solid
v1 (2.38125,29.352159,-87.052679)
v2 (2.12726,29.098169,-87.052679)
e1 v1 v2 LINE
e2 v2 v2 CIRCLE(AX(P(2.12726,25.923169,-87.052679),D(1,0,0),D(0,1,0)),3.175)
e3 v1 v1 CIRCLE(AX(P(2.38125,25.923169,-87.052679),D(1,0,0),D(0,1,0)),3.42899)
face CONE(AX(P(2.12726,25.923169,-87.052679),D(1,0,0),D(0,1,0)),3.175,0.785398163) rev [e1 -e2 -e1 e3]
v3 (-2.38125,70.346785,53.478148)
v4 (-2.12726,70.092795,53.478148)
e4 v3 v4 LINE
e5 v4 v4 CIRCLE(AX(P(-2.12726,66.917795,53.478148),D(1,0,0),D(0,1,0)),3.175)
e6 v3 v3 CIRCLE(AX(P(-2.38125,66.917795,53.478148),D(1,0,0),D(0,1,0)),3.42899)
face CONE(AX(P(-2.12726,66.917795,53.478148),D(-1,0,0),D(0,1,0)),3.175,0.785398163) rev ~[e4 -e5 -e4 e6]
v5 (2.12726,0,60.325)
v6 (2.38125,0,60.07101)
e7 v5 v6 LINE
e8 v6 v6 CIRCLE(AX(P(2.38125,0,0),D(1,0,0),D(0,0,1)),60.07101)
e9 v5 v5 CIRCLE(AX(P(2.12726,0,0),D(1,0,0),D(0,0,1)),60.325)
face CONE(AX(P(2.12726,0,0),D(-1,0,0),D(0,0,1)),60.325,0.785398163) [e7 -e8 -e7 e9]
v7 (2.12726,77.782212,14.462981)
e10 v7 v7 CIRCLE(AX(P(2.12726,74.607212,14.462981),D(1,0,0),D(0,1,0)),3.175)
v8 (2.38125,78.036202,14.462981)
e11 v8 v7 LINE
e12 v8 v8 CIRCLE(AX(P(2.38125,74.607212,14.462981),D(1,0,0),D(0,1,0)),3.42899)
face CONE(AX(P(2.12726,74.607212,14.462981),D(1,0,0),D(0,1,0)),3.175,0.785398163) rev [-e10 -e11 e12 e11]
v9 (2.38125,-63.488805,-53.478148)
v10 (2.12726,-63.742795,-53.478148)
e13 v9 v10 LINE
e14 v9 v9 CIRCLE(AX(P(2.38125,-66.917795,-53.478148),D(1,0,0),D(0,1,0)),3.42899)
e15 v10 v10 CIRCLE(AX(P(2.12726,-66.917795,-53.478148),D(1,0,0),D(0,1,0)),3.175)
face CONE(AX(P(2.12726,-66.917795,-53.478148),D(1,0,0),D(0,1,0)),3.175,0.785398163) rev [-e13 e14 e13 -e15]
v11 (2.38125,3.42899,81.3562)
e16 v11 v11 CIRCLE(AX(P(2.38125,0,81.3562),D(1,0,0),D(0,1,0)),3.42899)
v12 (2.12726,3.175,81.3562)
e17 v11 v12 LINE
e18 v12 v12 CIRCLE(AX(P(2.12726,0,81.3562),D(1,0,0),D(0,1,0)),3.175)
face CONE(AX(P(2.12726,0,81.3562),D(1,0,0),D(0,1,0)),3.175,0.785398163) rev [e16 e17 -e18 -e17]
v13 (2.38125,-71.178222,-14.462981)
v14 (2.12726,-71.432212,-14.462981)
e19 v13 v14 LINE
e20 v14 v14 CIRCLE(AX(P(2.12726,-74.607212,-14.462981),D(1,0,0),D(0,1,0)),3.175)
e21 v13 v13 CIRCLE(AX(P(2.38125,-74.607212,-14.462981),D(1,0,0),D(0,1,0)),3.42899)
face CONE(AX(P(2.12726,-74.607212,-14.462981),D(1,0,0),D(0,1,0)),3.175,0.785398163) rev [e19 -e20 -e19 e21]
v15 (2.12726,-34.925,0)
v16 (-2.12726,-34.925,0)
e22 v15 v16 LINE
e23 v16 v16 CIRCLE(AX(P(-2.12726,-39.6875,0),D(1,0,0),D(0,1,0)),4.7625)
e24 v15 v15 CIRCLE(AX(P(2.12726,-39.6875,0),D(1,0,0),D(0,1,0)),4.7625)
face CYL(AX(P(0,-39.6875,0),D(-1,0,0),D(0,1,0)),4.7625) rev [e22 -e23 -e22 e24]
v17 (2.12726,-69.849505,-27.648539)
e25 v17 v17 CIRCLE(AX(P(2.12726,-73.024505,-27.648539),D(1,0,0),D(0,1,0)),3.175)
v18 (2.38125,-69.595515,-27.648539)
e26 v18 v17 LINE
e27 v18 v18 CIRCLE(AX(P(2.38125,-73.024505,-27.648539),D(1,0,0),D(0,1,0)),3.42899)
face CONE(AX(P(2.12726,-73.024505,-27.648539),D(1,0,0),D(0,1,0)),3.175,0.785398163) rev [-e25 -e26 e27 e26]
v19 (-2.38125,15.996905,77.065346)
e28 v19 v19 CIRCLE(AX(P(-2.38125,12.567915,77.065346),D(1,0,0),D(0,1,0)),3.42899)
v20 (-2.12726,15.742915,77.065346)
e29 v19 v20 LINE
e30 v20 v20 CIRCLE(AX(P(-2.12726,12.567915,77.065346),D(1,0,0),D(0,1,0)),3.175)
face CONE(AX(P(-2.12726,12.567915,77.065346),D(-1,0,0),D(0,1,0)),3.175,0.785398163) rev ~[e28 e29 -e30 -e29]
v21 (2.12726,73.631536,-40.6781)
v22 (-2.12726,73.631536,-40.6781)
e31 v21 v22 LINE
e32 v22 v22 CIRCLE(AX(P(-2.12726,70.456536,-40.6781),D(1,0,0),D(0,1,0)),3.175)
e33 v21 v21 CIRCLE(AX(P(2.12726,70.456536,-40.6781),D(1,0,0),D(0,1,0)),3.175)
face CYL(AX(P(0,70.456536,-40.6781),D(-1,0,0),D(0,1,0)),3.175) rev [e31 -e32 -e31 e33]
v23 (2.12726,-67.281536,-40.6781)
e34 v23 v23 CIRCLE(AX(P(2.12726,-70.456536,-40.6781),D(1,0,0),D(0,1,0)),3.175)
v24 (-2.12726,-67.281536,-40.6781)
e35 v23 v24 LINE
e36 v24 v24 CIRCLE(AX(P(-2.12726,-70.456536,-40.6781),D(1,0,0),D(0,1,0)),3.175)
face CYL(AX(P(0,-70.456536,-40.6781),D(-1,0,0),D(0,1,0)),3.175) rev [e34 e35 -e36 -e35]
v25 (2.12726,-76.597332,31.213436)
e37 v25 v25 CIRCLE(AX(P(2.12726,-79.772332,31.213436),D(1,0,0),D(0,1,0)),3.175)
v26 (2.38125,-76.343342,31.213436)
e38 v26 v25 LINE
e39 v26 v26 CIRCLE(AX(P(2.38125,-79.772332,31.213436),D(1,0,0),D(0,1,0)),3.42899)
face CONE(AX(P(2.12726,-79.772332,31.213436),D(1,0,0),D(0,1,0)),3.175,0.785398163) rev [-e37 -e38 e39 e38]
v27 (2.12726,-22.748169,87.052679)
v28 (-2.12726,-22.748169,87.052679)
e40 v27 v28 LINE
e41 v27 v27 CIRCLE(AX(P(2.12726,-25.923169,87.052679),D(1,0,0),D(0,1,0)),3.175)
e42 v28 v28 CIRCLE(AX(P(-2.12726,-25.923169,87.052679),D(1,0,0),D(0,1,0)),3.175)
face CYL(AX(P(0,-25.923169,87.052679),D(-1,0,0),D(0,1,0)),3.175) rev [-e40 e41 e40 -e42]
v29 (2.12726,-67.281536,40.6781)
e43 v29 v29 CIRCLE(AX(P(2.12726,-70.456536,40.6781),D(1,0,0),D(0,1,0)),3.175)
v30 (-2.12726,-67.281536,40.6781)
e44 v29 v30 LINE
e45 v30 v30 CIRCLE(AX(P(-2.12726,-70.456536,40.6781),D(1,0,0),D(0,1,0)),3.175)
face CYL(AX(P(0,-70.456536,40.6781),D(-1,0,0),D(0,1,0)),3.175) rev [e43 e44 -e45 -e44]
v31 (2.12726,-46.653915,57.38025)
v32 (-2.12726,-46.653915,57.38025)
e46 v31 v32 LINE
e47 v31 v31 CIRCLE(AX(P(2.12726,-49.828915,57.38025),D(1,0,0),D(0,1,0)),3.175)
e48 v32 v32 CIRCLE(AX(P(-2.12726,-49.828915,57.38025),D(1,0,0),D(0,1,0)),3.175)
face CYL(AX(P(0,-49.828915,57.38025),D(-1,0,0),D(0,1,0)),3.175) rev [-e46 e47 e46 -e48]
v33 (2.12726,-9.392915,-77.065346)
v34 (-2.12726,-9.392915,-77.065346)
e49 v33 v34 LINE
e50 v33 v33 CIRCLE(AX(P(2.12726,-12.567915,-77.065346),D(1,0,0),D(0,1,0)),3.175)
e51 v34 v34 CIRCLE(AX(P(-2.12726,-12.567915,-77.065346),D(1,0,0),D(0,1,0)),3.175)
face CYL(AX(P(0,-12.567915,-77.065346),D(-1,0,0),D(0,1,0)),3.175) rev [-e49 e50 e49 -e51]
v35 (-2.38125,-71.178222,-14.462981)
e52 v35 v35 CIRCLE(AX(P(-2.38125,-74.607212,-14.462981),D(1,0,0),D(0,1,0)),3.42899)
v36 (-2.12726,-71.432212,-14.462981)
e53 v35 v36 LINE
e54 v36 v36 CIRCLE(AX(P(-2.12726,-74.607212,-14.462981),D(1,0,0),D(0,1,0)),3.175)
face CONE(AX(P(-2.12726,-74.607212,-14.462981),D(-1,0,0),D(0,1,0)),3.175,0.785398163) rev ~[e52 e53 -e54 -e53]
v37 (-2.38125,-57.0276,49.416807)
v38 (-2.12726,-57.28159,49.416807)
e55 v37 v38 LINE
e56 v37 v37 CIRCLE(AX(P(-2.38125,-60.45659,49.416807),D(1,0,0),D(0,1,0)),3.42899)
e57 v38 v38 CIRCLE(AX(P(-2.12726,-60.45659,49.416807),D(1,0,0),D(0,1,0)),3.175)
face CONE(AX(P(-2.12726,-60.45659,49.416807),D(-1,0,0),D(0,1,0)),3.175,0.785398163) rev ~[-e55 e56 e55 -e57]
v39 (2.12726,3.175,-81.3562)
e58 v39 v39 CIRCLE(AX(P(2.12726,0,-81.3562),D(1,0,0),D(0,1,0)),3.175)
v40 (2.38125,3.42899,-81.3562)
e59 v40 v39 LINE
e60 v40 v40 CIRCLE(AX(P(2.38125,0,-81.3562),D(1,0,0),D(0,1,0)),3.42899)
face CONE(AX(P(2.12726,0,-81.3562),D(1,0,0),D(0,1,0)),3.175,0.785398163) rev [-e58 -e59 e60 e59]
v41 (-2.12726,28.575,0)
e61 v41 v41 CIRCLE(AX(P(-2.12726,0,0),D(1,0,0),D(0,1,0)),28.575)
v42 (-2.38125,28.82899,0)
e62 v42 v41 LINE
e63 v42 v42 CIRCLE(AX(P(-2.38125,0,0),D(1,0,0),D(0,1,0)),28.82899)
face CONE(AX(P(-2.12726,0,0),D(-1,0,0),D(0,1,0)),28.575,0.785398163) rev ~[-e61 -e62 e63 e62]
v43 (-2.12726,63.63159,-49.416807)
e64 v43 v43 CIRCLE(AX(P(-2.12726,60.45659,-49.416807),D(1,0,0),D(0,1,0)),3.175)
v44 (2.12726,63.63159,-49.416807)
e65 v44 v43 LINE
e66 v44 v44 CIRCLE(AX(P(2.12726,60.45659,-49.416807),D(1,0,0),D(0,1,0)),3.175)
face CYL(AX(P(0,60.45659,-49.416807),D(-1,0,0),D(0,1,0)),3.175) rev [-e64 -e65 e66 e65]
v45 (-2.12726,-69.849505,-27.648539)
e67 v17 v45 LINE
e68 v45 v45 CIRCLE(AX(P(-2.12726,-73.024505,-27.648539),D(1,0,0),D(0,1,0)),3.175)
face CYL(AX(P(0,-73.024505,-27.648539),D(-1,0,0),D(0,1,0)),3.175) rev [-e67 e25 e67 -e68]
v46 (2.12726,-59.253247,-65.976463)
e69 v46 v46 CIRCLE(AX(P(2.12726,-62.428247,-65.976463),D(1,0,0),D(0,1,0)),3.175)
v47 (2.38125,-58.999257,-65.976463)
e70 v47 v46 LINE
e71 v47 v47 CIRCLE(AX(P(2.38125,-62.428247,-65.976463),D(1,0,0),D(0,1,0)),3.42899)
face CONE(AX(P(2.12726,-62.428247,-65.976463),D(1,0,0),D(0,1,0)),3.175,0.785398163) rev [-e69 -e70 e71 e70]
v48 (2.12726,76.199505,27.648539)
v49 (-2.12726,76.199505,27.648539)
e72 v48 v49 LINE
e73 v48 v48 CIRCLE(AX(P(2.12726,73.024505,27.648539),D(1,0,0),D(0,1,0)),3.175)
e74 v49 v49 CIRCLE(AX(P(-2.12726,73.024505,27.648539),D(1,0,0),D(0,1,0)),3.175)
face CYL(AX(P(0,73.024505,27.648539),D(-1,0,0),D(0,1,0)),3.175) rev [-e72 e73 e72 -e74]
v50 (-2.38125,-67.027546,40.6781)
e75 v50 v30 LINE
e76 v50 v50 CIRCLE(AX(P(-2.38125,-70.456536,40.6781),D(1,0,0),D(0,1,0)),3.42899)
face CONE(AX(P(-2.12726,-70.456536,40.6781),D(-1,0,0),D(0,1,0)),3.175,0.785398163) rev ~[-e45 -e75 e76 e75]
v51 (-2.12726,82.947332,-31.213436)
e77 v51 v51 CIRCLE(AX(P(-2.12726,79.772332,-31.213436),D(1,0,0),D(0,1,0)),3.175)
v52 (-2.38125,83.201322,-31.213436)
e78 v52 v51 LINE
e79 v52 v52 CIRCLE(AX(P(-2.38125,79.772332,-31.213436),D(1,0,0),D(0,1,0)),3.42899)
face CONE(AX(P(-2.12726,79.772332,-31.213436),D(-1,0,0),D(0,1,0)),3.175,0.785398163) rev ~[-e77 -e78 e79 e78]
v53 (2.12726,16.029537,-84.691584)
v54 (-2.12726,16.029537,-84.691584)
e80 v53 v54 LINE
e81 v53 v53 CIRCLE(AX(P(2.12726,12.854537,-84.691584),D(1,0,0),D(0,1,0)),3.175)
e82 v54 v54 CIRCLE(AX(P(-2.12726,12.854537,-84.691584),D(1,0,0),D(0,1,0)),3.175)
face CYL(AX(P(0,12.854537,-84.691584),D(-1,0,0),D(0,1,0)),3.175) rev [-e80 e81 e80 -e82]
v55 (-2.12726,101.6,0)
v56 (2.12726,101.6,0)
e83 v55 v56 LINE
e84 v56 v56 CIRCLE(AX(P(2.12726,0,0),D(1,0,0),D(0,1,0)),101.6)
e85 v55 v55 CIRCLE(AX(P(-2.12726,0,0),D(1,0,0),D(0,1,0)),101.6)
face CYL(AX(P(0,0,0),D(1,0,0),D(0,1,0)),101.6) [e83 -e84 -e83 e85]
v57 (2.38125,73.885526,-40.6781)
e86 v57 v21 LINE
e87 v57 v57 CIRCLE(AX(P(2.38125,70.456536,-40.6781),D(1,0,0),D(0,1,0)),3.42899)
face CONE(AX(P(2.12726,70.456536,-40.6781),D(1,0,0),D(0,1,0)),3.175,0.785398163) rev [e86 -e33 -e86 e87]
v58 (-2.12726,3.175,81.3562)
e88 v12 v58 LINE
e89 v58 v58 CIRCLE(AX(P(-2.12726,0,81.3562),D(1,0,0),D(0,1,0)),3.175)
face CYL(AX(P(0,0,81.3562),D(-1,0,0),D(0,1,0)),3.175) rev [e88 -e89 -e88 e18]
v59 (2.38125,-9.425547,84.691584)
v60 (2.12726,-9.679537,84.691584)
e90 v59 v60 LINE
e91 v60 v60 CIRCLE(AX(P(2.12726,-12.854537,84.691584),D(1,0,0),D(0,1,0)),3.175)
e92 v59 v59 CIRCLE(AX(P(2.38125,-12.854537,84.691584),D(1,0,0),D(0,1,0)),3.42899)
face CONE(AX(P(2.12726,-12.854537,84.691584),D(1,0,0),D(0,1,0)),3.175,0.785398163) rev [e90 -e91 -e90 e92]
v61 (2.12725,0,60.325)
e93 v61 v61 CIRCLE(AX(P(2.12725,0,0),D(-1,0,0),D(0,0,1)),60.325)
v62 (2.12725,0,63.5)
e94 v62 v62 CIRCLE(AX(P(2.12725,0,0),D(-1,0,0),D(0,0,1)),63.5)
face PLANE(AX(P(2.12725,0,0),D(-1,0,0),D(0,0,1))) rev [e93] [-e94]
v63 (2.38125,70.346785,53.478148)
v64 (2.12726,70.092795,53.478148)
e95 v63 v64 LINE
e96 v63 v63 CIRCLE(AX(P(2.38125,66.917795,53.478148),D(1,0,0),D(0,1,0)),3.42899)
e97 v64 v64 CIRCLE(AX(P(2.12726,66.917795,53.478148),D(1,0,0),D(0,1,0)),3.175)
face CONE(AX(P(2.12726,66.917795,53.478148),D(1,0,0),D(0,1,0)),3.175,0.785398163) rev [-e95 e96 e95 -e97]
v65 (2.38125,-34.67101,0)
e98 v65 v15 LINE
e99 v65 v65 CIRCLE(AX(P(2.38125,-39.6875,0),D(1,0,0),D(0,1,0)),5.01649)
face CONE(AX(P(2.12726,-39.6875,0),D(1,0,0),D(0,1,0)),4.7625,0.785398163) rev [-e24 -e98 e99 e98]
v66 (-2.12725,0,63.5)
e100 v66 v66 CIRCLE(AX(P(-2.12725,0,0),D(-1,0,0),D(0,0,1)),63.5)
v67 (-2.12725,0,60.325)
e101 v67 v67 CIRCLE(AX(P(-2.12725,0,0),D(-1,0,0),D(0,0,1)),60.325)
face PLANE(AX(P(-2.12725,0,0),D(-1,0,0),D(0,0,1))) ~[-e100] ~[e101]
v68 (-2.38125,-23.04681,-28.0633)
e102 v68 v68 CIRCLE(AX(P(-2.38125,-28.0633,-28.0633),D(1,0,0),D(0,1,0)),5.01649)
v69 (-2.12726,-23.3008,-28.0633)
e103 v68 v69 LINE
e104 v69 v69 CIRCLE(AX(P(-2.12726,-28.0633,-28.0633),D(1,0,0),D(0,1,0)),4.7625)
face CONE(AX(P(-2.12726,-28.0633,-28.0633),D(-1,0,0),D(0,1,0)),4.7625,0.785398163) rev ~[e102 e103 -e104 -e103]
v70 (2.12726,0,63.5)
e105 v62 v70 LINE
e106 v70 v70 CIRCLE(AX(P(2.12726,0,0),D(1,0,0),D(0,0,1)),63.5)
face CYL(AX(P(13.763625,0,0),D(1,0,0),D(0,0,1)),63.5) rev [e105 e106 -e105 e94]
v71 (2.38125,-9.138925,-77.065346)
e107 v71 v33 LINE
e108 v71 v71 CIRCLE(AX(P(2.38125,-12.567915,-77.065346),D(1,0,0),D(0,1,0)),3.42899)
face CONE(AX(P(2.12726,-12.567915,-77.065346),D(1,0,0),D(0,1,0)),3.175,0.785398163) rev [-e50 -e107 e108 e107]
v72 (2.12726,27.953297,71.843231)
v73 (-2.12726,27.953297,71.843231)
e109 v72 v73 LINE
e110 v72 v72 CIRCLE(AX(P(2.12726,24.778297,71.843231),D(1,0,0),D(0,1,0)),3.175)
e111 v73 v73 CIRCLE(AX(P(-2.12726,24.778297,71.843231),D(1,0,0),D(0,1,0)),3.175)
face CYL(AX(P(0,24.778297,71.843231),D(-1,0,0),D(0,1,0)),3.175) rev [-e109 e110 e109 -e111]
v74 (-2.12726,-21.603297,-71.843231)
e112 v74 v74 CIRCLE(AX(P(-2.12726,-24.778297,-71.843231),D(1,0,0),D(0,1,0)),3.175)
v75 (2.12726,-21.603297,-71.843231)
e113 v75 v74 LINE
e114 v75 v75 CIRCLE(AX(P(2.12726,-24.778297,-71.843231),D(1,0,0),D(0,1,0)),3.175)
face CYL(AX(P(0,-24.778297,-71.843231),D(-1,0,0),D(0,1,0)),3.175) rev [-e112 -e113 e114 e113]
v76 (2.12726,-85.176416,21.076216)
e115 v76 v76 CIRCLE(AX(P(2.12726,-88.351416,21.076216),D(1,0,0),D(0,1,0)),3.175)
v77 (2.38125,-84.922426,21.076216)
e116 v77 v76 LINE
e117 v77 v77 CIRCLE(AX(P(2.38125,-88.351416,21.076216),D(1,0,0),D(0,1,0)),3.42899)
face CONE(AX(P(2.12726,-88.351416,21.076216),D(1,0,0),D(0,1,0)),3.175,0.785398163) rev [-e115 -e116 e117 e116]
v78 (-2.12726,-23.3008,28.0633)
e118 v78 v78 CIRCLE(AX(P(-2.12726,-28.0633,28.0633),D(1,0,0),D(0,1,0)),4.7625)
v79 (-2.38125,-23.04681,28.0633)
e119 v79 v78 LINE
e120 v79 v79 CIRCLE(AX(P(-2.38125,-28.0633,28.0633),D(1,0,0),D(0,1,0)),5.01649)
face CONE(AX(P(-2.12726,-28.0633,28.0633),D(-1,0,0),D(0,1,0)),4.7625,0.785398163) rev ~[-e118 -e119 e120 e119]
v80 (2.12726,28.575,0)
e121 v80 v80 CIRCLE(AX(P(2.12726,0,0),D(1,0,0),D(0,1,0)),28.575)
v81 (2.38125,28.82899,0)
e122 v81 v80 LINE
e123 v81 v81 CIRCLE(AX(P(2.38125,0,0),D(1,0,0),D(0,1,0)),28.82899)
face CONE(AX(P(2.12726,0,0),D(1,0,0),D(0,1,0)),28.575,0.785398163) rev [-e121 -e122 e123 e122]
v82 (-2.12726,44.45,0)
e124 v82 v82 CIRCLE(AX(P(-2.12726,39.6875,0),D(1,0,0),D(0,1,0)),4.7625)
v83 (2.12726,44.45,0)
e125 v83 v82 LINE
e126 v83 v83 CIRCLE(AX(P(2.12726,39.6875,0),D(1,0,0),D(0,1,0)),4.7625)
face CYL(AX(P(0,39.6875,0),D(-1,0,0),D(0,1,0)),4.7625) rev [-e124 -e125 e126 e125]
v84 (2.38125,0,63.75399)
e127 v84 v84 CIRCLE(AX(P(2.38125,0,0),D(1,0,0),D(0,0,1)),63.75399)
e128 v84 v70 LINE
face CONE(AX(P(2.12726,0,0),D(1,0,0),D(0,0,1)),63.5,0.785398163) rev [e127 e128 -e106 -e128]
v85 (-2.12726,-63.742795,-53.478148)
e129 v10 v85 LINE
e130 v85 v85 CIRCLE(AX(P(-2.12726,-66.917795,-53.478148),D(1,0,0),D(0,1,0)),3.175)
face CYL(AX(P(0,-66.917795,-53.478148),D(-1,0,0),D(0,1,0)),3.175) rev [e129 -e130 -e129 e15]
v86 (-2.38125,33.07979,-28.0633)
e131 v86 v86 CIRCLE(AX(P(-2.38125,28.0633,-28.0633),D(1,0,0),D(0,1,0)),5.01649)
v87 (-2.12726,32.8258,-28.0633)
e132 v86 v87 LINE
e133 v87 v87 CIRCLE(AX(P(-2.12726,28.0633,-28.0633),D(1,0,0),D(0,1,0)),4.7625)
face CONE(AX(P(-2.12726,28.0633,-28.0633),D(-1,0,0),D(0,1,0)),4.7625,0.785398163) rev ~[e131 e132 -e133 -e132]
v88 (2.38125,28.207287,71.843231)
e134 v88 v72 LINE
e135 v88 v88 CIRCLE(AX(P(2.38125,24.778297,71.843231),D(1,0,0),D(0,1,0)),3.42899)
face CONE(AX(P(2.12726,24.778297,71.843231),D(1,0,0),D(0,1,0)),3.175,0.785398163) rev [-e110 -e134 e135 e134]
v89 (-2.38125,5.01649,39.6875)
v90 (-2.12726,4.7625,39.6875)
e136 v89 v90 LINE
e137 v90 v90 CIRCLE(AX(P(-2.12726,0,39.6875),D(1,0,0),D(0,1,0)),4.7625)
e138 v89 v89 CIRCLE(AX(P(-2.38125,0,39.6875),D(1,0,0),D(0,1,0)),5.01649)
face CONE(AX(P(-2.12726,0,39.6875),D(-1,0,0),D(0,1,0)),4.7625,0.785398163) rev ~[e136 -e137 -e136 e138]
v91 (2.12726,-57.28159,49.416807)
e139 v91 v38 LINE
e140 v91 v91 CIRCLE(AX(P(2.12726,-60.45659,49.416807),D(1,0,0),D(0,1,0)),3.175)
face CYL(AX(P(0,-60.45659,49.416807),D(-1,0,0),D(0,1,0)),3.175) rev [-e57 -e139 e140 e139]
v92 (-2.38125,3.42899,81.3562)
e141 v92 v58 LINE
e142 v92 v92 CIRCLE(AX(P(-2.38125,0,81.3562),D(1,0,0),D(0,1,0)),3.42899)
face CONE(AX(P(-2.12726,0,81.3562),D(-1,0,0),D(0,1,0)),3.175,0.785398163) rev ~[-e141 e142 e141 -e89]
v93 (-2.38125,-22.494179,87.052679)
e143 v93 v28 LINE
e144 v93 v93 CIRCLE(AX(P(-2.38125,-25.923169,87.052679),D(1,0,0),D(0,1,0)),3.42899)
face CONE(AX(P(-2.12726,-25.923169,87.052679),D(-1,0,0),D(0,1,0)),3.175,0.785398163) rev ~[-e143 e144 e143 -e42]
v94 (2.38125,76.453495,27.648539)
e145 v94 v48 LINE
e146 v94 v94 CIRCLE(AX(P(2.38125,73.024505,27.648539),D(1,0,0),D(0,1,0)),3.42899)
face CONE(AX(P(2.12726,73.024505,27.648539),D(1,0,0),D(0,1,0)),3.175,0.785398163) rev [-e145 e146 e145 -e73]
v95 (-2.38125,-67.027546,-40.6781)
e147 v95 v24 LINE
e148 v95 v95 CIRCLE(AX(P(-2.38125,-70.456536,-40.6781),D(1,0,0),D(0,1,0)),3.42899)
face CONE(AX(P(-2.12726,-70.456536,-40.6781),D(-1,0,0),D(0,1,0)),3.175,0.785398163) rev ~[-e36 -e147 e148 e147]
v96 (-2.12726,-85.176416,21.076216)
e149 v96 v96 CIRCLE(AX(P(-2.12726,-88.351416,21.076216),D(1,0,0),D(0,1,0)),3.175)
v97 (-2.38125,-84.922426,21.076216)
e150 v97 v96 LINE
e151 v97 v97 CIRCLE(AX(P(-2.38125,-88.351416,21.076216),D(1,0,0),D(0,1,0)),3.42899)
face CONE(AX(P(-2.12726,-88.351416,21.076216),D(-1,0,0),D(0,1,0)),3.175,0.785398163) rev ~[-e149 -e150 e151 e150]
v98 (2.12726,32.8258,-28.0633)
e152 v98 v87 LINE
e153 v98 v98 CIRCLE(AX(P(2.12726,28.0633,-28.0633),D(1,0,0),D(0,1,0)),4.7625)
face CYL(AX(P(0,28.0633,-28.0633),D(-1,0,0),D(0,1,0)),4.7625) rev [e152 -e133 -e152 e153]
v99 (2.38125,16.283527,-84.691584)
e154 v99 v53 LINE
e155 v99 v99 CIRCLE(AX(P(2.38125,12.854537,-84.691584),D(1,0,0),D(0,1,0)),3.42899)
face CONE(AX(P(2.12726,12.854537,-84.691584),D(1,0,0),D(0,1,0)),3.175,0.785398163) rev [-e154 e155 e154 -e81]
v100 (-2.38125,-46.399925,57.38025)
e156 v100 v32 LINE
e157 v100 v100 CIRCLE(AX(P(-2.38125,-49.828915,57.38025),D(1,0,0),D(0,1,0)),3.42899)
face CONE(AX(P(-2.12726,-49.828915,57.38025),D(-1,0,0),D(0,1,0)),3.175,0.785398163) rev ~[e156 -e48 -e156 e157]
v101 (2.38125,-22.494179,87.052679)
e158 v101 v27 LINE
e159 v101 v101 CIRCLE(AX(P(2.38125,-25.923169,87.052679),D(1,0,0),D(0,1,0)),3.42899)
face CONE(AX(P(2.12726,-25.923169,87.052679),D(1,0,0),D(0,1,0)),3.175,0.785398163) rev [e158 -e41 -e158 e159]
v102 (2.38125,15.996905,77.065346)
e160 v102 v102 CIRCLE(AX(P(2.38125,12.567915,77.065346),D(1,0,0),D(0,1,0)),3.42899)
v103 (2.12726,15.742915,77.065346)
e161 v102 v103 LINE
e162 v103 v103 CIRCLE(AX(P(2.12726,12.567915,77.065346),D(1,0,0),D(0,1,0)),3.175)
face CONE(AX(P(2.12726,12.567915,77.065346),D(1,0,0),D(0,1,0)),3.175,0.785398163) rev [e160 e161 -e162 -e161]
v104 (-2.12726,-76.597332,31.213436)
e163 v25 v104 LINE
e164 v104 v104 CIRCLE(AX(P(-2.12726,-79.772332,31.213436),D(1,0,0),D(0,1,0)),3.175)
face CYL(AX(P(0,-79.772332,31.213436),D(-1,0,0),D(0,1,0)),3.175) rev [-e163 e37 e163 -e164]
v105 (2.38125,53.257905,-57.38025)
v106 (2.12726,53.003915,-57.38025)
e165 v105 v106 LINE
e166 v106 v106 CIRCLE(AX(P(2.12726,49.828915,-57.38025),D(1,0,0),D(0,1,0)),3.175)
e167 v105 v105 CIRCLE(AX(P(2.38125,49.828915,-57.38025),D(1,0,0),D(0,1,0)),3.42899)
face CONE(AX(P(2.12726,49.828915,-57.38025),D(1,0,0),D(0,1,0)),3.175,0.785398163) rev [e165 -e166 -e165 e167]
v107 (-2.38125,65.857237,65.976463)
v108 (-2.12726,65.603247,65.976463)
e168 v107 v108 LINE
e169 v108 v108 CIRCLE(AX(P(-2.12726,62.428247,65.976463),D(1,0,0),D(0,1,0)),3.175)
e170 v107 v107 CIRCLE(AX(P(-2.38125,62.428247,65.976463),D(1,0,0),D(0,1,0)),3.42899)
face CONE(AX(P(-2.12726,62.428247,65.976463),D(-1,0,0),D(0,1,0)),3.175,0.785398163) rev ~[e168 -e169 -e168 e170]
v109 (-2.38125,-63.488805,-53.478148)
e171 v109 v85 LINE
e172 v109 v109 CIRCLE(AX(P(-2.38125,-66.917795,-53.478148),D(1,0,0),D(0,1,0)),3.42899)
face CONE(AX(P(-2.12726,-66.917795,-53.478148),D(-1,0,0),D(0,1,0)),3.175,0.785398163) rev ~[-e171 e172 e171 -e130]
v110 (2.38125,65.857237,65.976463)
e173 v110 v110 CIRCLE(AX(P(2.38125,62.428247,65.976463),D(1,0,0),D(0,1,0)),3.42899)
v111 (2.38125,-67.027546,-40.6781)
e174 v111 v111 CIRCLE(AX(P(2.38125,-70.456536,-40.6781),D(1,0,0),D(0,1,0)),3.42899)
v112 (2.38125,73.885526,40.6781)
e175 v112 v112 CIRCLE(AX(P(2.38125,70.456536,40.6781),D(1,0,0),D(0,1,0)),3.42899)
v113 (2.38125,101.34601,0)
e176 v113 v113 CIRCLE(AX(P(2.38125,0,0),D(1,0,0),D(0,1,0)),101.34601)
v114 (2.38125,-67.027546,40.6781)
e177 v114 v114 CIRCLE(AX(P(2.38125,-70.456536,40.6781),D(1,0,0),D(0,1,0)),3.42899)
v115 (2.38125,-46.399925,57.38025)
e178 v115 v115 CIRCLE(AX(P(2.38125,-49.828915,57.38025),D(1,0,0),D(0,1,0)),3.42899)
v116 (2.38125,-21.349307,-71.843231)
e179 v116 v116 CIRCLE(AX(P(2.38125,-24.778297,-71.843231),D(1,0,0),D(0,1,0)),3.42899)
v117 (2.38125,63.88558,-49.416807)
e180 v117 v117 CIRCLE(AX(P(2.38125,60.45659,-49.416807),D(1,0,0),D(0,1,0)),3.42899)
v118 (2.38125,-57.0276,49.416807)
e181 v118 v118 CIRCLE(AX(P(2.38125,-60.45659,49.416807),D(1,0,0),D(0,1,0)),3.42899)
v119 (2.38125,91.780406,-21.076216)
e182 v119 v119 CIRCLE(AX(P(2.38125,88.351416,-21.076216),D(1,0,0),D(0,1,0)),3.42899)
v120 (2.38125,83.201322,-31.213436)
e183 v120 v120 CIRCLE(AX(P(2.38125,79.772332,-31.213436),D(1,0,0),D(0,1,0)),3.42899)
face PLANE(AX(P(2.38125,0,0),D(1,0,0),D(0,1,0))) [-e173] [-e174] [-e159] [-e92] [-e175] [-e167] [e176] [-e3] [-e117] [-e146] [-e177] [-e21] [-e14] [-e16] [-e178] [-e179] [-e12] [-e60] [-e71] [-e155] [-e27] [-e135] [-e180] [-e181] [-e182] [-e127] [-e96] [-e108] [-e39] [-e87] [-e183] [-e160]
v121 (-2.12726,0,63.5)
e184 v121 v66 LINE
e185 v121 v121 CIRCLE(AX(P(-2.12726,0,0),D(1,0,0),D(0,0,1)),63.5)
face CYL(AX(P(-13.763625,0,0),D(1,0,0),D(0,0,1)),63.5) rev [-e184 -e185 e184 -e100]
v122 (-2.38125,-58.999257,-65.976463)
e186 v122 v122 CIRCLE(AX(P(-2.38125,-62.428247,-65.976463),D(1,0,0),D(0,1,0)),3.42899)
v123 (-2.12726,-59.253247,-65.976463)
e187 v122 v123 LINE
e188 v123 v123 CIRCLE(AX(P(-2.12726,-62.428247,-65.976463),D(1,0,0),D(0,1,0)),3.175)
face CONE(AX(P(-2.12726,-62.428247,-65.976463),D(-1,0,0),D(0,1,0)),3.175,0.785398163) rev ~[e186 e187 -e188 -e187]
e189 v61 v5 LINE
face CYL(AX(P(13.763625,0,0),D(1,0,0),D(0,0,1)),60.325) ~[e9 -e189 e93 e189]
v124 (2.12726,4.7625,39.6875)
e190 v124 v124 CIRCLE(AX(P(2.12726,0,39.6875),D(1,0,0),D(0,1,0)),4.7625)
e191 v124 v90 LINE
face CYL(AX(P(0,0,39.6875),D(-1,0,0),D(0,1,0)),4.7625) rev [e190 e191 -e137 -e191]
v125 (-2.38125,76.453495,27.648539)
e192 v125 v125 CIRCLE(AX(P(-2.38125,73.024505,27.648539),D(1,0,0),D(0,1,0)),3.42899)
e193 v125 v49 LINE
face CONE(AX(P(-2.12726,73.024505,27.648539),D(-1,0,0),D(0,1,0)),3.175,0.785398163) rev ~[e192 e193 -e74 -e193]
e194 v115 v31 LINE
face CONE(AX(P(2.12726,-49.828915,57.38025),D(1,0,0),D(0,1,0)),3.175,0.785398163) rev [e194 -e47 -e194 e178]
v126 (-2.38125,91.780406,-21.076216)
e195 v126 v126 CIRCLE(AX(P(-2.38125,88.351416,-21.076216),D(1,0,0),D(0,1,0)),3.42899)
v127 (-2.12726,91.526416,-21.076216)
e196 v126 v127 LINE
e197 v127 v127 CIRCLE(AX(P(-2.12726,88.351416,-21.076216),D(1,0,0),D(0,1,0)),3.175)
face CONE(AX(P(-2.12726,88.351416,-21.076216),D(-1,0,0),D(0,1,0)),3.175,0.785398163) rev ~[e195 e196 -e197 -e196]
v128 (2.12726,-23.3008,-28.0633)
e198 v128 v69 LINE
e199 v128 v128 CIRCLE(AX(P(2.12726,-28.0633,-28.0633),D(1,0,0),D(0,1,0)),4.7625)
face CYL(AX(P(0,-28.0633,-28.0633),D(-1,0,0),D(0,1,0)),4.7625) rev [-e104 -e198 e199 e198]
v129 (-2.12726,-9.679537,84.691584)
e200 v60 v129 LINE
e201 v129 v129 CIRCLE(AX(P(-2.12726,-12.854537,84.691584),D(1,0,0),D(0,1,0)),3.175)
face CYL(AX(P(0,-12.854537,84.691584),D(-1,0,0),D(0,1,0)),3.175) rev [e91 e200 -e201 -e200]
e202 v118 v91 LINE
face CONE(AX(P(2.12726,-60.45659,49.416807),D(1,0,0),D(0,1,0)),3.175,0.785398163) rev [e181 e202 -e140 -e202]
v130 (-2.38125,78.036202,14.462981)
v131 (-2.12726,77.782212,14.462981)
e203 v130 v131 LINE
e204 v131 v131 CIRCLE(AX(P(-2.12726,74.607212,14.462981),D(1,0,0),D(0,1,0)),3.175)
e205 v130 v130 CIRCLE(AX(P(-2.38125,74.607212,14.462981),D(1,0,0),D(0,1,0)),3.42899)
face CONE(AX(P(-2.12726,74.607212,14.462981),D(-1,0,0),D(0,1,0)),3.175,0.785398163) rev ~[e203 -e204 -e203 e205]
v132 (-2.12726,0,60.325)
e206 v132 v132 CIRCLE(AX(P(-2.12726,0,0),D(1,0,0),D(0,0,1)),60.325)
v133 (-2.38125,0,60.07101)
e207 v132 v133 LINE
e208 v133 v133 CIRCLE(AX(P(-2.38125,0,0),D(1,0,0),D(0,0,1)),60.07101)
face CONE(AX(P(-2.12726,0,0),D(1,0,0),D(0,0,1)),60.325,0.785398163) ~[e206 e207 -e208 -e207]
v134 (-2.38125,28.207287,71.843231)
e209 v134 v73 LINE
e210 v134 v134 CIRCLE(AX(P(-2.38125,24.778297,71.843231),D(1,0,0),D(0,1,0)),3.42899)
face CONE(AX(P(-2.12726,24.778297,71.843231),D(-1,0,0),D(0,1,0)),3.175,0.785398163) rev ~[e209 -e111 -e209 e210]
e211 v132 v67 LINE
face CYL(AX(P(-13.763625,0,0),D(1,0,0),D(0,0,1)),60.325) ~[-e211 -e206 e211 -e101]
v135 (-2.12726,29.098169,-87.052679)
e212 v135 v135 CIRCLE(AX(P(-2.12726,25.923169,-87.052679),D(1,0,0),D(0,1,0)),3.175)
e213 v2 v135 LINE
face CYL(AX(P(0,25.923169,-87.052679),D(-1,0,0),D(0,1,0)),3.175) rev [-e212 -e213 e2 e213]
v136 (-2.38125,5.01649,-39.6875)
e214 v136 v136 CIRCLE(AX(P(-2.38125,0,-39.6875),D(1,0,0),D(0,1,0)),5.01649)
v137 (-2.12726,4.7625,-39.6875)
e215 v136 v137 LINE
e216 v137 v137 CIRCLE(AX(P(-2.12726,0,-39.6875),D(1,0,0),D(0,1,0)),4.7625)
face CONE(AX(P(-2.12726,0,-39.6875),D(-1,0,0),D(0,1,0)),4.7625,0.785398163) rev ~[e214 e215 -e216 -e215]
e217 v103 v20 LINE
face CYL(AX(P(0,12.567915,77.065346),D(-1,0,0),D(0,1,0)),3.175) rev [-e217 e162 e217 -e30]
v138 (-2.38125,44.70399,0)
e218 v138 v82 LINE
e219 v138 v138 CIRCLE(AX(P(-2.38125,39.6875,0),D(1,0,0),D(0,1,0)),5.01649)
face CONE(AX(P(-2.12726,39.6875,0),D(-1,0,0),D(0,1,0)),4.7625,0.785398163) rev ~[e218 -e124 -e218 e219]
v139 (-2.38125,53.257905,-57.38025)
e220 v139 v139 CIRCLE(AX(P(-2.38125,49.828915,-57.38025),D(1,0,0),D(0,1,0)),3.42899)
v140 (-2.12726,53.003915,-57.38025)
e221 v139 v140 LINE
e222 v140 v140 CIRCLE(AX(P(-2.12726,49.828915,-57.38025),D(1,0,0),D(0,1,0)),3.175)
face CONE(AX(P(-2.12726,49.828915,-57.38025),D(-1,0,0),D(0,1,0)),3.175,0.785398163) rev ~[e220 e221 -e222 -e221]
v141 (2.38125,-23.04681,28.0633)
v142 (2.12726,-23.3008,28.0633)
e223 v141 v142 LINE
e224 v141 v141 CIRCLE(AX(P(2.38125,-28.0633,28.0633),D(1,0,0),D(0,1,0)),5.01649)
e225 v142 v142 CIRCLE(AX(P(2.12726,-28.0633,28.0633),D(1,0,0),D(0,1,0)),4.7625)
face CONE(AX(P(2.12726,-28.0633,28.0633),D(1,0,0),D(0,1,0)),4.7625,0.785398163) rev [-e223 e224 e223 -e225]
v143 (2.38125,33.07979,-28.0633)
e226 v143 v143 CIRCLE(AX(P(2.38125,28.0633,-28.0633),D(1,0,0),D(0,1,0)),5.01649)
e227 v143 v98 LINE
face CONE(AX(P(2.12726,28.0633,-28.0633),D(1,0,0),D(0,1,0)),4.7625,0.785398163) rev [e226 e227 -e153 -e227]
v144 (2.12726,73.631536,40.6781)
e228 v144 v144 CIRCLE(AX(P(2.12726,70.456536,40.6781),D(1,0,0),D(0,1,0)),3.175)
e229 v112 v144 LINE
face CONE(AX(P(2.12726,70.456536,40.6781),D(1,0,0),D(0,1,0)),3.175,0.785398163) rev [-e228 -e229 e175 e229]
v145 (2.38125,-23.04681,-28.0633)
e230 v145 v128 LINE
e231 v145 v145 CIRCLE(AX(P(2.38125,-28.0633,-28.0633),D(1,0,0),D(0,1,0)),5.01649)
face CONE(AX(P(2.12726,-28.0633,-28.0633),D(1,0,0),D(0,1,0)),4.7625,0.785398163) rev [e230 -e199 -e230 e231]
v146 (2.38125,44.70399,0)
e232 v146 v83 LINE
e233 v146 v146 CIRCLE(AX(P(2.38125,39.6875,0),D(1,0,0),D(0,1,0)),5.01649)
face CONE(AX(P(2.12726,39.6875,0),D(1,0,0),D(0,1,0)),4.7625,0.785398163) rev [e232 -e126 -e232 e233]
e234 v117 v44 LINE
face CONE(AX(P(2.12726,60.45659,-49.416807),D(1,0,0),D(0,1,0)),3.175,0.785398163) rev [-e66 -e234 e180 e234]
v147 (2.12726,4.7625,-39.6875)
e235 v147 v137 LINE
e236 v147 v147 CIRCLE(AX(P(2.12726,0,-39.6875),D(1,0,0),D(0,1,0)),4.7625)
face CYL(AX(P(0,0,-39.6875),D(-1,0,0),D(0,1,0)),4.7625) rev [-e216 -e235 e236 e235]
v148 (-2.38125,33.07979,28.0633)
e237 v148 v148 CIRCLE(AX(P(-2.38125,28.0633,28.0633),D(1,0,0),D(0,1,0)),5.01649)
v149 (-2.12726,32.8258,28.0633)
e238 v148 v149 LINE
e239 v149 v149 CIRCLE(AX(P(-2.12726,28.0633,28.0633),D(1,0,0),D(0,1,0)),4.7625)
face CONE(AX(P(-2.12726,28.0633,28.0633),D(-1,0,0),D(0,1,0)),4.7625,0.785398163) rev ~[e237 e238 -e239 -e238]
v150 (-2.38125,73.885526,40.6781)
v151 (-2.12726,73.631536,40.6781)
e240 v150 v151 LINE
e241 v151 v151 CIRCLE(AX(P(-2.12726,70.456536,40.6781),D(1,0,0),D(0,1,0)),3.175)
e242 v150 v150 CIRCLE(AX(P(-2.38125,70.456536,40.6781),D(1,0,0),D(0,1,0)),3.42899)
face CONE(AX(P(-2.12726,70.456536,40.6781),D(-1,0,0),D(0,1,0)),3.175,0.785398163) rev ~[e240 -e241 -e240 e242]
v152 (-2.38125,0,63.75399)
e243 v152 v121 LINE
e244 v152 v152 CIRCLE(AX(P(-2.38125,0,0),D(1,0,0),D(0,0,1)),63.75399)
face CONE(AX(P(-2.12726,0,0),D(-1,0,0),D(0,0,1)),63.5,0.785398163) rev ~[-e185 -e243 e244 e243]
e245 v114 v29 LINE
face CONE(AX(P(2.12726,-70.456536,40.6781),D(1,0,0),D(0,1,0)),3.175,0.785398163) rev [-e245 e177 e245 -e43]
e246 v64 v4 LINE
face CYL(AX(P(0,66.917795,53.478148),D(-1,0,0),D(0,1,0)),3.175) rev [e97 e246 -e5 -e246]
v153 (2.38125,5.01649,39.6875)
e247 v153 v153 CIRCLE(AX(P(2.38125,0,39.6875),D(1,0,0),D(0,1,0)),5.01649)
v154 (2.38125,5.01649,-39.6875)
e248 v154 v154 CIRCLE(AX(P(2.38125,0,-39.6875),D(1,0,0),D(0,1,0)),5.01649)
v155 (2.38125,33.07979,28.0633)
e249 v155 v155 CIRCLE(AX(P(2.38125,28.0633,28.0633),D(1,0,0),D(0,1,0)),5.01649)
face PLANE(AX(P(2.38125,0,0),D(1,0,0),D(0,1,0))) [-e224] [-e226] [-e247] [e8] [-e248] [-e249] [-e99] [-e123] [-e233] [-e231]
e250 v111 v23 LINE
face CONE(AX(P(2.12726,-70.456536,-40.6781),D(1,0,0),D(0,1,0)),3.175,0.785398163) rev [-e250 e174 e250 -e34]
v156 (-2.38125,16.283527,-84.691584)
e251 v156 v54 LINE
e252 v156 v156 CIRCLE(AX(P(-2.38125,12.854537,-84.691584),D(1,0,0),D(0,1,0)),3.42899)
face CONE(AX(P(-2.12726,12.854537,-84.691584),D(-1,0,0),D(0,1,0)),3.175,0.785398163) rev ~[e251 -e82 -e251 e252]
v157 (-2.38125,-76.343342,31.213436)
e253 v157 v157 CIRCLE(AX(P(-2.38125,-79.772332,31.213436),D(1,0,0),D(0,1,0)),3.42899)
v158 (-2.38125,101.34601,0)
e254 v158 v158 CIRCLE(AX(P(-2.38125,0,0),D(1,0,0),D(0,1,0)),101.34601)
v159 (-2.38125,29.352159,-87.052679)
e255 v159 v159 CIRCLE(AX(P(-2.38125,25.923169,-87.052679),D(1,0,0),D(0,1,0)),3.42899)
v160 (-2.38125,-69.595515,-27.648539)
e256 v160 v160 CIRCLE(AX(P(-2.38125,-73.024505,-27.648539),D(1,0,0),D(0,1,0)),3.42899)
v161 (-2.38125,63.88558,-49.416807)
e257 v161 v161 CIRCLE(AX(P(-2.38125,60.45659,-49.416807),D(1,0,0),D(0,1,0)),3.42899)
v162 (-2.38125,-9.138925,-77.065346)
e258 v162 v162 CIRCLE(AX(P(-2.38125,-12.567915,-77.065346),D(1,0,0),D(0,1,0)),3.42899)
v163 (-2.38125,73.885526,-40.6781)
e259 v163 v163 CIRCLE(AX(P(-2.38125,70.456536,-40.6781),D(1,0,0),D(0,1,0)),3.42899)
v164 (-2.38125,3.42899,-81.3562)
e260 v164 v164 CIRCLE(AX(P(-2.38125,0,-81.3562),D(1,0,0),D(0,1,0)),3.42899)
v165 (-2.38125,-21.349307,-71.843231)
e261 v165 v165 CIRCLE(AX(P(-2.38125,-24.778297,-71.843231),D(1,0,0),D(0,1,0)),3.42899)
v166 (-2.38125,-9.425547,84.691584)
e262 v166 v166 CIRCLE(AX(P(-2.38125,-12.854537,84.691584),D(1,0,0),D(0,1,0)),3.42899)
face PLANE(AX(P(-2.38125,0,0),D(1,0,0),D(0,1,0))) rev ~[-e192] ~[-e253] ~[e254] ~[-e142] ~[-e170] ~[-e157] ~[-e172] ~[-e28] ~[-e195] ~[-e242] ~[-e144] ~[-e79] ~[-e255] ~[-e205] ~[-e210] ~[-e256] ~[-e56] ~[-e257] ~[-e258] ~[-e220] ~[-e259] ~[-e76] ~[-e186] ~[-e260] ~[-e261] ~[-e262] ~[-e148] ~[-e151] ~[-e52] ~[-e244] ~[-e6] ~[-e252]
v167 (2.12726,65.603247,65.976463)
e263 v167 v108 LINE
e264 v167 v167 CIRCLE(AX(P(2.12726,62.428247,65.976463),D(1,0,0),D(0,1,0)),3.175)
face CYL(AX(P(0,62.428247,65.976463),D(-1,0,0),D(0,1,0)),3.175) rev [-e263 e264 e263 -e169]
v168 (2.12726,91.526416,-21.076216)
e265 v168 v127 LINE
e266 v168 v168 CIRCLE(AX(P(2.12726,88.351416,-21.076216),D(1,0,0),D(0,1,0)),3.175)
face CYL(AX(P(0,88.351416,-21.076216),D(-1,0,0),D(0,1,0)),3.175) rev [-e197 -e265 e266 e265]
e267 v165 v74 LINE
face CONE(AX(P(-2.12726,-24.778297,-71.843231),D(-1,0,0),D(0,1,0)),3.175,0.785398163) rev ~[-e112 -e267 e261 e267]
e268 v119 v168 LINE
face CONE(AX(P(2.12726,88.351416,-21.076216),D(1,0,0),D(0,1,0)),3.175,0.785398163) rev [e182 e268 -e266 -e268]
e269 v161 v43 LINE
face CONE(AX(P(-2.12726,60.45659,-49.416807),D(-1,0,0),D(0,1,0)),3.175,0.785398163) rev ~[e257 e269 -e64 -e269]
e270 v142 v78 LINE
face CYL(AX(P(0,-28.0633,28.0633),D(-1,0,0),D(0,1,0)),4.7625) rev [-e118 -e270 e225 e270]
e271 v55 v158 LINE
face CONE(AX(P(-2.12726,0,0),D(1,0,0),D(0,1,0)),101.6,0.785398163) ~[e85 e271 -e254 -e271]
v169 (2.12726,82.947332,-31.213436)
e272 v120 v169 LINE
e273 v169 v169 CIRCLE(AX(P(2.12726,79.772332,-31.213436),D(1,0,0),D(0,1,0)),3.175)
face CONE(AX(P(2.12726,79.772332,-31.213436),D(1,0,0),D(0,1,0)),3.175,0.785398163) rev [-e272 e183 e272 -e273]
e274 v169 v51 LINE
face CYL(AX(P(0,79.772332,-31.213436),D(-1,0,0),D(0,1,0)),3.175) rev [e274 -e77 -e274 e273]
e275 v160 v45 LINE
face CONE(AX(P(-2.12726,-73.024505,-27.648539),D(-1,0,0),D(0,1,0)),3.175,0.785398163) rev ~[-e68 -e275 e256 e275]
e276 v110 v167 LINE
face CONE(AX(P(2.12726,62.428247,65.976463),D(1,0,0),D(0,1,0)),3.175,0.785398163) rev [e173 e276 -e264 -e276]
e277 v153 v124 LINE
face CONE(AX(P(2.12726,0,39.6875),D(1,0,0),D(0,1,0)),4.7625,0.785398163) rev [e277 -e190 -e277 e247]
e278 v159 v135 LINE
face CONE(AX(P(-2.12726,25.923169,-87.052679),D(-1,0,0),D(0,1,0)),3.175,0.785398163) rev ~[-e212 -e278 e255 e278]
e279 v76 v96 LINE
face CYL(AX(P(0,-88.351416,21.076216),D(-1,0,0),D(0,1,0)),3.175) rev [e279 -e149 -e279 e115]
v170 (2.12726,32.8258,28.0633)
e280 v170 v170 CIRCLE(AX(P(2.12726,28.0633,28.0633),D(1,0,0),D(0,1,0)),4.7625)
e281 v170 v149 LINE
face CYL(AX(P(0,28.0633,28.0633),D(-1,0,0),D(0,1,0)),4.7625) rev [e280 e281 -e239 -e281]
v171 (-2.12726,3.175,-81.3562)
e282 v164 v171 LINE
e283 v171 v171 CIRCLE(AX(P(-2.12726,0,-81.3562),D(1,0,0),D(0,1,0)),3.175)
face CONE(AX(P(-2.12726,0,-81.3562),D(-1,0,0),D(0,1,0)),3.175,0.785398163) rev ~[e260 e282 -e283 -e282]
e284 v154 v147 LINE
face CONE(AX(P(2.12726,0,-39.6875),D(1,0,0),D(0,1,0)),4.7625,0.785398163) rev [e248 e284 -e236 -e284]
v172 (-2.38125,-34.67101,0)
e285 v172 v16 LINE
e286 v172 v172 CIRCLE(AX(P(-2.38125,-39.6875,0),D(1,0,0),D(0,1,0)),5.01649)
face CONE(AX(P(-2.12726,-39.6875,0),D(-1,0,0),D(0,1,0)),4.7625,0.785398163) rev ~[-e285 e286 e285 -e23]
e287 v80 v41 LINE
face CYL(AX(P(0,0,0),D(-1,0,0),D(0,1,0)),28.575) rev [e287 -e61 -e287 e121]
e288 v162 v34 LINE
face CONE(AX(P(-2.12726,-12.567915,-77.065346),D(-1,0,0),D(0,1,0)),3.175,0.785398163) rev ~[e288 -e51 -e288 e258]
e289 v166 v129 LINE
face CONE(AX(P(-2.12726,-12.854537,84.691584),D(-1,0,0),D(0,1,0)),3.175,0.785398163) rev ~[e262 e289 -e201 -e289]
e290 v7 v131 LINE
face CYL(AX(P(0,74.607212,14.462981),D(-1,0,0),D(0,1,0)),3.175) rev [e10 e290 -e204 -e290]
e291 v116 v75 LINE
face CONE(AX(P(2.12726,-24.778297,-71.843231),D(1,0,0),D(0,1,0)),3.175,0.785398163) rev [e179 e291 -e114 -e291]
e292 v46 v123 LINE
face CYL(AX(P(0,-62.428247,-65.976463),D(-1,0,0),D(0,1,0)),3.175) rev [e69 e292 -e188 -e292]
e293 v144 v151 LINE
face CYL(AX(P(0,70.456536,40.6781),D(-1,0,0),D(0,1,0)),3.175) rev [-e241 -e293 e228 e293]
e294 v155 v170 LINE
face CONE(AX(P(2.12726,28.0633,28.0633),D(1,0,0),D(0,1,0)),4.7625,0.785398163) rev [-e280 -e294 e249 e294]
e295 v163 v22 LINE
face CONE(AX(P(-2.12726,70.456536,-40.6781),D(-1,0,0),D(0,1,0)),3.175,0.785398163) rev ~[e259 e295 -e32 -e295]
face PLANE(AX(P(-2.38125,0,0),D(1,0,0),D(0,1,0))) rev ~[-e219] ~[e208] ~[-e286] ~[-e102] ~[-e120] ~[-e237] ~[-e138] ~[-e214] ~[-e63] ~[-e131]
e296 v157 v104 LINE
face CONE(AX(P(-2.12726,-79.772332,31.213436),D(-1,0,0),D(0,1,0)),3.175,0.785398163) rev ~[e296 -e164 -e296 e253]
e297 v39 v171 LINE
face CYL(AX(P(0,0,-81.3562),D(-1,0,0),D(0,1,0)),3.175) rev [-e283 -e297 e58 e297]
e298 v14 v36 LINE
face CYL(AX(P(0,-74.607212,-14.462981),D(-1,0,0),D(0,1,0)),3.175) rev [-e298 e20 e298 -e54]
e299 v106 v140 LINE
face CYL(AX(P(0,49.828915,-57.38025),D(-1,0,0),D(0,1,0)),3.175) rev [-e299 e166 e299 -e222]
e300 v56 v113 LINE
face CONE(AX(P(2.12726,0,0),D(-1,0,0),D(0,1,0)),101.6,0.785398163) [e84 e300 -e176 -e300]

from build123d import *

# Parameters (mm, degrees)
F0_R     = 101.6
F0_R_2   = 3.175
F0_R_3   = 4.7625
F0_R_4   = 28.575
F1_DEPTH = 2.38125
F2_W     = 23.27275
F2_H     = 3.175
F4_SIZE  = 0.25399


# Not quite as in the source:
# - a fillet or chamfer is up to 0.001 mm smaller than in the source, because OpenCascade refuses the exact size


with BuildPart() as f1:
    # F0 (on Right) → F1 (new body, symmetric)
    with BuildSketch(Plane.YZ):
        Circle(F0_R)
        with Locations((-62.4282468049, -65.9764627324)):
            Circle(F0_R_2, mode=Mode.SUBTRACT)
        with Locations((-66.9177945797, -53.478147823)):
            Circle(F0_R_2, mode=Mode.SUBTRACT)
        with Locations((-12.5679149295, -77.0653458753)):
            Circle(F0_R_2, mode=Mode.SUBTRACT)
        with Locations((0, -81.3562)):
            Circle(F0_R_2, mode=Mode.SUBTRACT)
        with Locations((-24.7782971774, -71.843231346)):
            Circle(F0_R_2, mode=Mode.SUBTRACT)
        with Locations((-70.4565359554, -40.6781)):
            Circle(F0_R_2, mode=Mode.SUBTRACT)
        with Locations((-73.0245047442, -27.6485393361)):
            Circle(F0_R_2, mode=Mode.SUBTRACT)
        with Locations((-74.6072120243, -14.4629808549)):
            Circle(F0_R_2, mode=Mode.SUBTRACT)
        with Locations((-28.0633003783, -28.0633003783)):
            Circle(F0_R_3, mode=Mode.SUBTRACT)
        with Locations((0, -39.6875)):
            Circle(F0_R_3, mode=Mode.SUBTRACT)
        with Locations((-39.6875, 0)):
            Circle(F0_R_3, mode=Mode.SUBTRACT)
        Circle(F0_R_4, mode=Mode.SUBTRACT)
        with Locations((12.8545372722, -84.6915839827)):
            Circle(F0_R_2, mode=Mode.SUBTRACT)
        with Locations((25.9231693756, -87.052679013)):
            Circle(F0_R_2, mode=Mode.SUBTRACT)
        with Locations((49.8289148469, -57.3802504911)):
            Circle(F0_R_2, mode=Mode.SUBTRACT)
        with Locations((28.0633003783, -28.0633003783)):
            Circle(F0_R_3, mode=Mode.SUBTRACT)
        with Locations((39.6875, 0)):
            Circle(F0_R_3, mode=Mode.SUBTRACT)
        with Locations((60.4565898147, -49.4168065392)):
            Circle(F0_R_2, mode=Mode.SUBTRACT)
        with Locations((70.4565359554, -40.6781)):
            Circle(F0_R_2, mode=Mode.SUBTRACT)
        with Locations((79.7723318519, -31.2134361597)):
            Circle(F0_R_2, mode=Mode.SUBTRACT)
        with Locations((88.3514161805, -21.0762162806)):
            Circle(F0_R_2, mode=Mode.SUBTRACT)
        with Locations((-88.3514161805, 21.0762162806)):
            Circle(F0_R_2, mode=Mode.SUBTRACT)
        with Locations((-79.7723318519, 31.2134361597)):
            Circle(F0_R_2, mode=Mode.SUBTRACT)
        with Locations((-70.4565359554, 40.6781)):
            Circle(F0_R_2, mode=Mode.SUBTRACT)
        with Locations((-60.4565898147, 49.4168065392)):
            Circle(F0_R_2, mode=Mode.SUBTRACT)
        with Locations((-28.0633003783, 28.0633003783)):
            Circle(F0_R_3, mode=Mode.SUBTRACT)
        with Locations((0, 39.6875)):
            Circle(F0_R_3, mode=Mode.SUBTRACT)
        with Locations((-49.8289148469, 57.3802504911)):
            Circle(F0_R_2, mode=Mode.SUBTRACT)
        with Locations((-25.9231693756, 87.052679013)):
            Circle(F0_R_2, mode=Mode.SUBTRACT)
        with Locations((-12.8545372722, 84.6915839827)):
            Circle(F0_R_2, mode=Mode.SUBTRACT)
        with Locations((0, 81.3562)):
            Circle(F0_R_2, mode=Mode.SUBTRACT)
        with Locations((28.0633003783, 28.0633003783)):
            Circle(F0_R_3, mode=Mode.SUBTRACT)
        with Locations((74.6072120243, 14.4629808549)):
            Circle(F0_R_2, mode=Mode.SUBTRACT)
        with Locations((73.0245047442, 27.6485393361)):
            Circle(F0_R_2, mode=Mode.SUBTRACT)
        with Locations((70.4565359554, 40.6781)):
            Circle(F0_R_2, mode=Mode.SUBTRACT)
        with Locations((24.7782971774, 71.843231346)):
            Circle(F0_R_2, mode=Mode.SUBTRACT)
        with Locations((12.5679149295, 77.0653458753)):
            Circle(F0_R_2, mode=Mode.SUBTRACT)
        with Locations((66.9177945797, 53.478147823)):
            Circle(F0_R_2, mode=Mode.SUBTRACT)
        with Locations((62.4282468049, 65.9764627324)):
            Circle(F0_R_2, mode=Mode.SUBTRACT)
    extrude(amount=F1_DEPTH, both=True)

    # F2 (on Front) → F3 (revolve, cut)
    with BuildSketch(Plane.XZ):
        with Locations((-13.763625, 61.9125)):
            Rectangle(F2_W, F2_H)
        with Locations((13.763625, 61.9125)):
            Rectangle(F2_W, F2_H)
    revolve(axis=Axis((-12.7, 0, 0), (-1, 0, 0)), mode=Mode.SUBTRACT)

    # F4 (size 0.254 in the source; OpenCascade refuses exactly that, so slightly less here)
    f4_edges = [f1.edges().sort_by_distance(p)[0] for p in [
        (-2.38125, -101.6, 0),
        (-2.38125, -65.603247, -65.976463),
        (-2.38125, -70.092795, -53.478148),
        (-2.38125, -27.953297, -71.843231),
        (-2.38125, -3.175, -81.3562),
        (-2.38125, -15.742915, -77.065346),
        (-2.38125, -73.631536, -40.6781),
        (-2.38125, -76.199505, -27.648539),
        (-2.38125, -77.782212, -14.462981),
        (-2.38125, 9.679537, -84.691584),
        (-2.38125, 22.748169, -87.052679),
        (-2.38125, 46.653915, -57.38025),
        (-2.38125, 57.28159, -49.416807),
        (-2.38125, 67.281536, -40.6781),
        (-2.38125, 76.597332, -31.213436),
        (-2.38125, 85.176416, -21.076216),
        (-2.38125, -91.526416, 21.076216),
        (-2.38125, -82.947332, 31.213436),
        (-2.38125, -73.631536, 40.6781),
        (-2.38125, 0, -63.5),
        (-2.38125, -63.63159, 49.416807),
        (-2.38125, -53.003915, 57.38025),
        (-2.38125, -29.098169, 87.052679),
        (-2.38125, -16.029537, 84.691584),
        (-2.38125, -3.175, 81.3562),
        (-2.38125, 71.432212, 14.462981),
        (-2.38125, 69.849505, 27.648539),
        (-2.38125, 67.281536, 40.6781),
        (-2.38125, 9.392915, 77.065346),
        (-2.38125, 21.603297, 71.843231),
        (-2.38125, 63.742795, 53.478148),
        (-2.38125, 59.253247, 65.976463),
        (-2.38125, 0, -60.325),
        (-2.38125, -32.8258, -28.0633),
        (-2.38125, -4.7625, -39.6875),
        (-2.38125, 23.3008, -28.0633),
        (-2.38125, -44.45, 0),
        (-2.38125, -28.575, 0),
        (-2.38125, -32.8258, 28.0633),
        (-2.38125, -4.7625, 39.6875),
        (-2.38125, 34.925, 0),
        (-2.38125, 23.3008, 28.0633),
        (2.38125, 0, -60.325),
        (2.38125, -32.8258, -28.0633),
        (2.38125, -4.7625, -39.6875),
        (2.38125, 23.3008, -28.0633),
        (2.38125, -44.45, 0),
        (2.38125, -28.575, 0),
        (2.38125, -32.8258, 28.0633),
        (2.38125, -4.7625, 39.6875),
        (2.38125, 34.925, 0),
        (2.38125, 23.3008, 28.0633),
        (2.38125, -101.6, 0),
        (2.38125, -65.603247, -65.976463),
        (2.38125, -70.092795, -53.478148),
        (2.38125, -27.953297, -71.843231),
        (2.38125, -3.175, -81.3562),
        (2.38125, -15.742915, -77.065346),
        (2.38125, -73.631536, -40.6781),
        (2.38125, -76.199505, -27.648539),
        (2.38125, -77.782212, -14.462981),
        (2.38125, 9.679537, -84.691584),
        (2.38125, 22.748169, -87.052679),
        (2.38125, 46.653915, -57.38025),
        (2.38125, 57.28159, -49.416807),
        (2.38125, 67.281536, -40.6781),
        (2.38125, 76.597332, -31.213436),
        (2.38125, 85.176416, -21.076216),
        (2.38125, -91.526416, 21.076216),
        (2.38125, -82.947332, 31.213436),
        (2.38125, -73.631536, 40.6781),
        (2.38125, 0, -63.5),
        (2.38125, -63.63159, 49.416807),
        (2.38125, -53.003915, 57.38025),
        (2.38125, -29.098169, 87.052679),
        (2.38125, -16.029537, 84.691584),
        (2.38125, -3.175, 81.3562),
        (2.38125, 71.432212, 14.462981),
        (2.38125, 69.849505, 27.648539),
        (2.38125, 67.281536, 40.6781),
        (2.38125, 9.392915, 77.065346),
        (2.38125, 21.603297, 71.843231),
        (2.38125, 63.742795, 53.478148),
        (2.38125, 59.253247, 65.976463),
    ]]
    chamfer(f4_edges, length=F4_SIZE)


solid = f1.part
